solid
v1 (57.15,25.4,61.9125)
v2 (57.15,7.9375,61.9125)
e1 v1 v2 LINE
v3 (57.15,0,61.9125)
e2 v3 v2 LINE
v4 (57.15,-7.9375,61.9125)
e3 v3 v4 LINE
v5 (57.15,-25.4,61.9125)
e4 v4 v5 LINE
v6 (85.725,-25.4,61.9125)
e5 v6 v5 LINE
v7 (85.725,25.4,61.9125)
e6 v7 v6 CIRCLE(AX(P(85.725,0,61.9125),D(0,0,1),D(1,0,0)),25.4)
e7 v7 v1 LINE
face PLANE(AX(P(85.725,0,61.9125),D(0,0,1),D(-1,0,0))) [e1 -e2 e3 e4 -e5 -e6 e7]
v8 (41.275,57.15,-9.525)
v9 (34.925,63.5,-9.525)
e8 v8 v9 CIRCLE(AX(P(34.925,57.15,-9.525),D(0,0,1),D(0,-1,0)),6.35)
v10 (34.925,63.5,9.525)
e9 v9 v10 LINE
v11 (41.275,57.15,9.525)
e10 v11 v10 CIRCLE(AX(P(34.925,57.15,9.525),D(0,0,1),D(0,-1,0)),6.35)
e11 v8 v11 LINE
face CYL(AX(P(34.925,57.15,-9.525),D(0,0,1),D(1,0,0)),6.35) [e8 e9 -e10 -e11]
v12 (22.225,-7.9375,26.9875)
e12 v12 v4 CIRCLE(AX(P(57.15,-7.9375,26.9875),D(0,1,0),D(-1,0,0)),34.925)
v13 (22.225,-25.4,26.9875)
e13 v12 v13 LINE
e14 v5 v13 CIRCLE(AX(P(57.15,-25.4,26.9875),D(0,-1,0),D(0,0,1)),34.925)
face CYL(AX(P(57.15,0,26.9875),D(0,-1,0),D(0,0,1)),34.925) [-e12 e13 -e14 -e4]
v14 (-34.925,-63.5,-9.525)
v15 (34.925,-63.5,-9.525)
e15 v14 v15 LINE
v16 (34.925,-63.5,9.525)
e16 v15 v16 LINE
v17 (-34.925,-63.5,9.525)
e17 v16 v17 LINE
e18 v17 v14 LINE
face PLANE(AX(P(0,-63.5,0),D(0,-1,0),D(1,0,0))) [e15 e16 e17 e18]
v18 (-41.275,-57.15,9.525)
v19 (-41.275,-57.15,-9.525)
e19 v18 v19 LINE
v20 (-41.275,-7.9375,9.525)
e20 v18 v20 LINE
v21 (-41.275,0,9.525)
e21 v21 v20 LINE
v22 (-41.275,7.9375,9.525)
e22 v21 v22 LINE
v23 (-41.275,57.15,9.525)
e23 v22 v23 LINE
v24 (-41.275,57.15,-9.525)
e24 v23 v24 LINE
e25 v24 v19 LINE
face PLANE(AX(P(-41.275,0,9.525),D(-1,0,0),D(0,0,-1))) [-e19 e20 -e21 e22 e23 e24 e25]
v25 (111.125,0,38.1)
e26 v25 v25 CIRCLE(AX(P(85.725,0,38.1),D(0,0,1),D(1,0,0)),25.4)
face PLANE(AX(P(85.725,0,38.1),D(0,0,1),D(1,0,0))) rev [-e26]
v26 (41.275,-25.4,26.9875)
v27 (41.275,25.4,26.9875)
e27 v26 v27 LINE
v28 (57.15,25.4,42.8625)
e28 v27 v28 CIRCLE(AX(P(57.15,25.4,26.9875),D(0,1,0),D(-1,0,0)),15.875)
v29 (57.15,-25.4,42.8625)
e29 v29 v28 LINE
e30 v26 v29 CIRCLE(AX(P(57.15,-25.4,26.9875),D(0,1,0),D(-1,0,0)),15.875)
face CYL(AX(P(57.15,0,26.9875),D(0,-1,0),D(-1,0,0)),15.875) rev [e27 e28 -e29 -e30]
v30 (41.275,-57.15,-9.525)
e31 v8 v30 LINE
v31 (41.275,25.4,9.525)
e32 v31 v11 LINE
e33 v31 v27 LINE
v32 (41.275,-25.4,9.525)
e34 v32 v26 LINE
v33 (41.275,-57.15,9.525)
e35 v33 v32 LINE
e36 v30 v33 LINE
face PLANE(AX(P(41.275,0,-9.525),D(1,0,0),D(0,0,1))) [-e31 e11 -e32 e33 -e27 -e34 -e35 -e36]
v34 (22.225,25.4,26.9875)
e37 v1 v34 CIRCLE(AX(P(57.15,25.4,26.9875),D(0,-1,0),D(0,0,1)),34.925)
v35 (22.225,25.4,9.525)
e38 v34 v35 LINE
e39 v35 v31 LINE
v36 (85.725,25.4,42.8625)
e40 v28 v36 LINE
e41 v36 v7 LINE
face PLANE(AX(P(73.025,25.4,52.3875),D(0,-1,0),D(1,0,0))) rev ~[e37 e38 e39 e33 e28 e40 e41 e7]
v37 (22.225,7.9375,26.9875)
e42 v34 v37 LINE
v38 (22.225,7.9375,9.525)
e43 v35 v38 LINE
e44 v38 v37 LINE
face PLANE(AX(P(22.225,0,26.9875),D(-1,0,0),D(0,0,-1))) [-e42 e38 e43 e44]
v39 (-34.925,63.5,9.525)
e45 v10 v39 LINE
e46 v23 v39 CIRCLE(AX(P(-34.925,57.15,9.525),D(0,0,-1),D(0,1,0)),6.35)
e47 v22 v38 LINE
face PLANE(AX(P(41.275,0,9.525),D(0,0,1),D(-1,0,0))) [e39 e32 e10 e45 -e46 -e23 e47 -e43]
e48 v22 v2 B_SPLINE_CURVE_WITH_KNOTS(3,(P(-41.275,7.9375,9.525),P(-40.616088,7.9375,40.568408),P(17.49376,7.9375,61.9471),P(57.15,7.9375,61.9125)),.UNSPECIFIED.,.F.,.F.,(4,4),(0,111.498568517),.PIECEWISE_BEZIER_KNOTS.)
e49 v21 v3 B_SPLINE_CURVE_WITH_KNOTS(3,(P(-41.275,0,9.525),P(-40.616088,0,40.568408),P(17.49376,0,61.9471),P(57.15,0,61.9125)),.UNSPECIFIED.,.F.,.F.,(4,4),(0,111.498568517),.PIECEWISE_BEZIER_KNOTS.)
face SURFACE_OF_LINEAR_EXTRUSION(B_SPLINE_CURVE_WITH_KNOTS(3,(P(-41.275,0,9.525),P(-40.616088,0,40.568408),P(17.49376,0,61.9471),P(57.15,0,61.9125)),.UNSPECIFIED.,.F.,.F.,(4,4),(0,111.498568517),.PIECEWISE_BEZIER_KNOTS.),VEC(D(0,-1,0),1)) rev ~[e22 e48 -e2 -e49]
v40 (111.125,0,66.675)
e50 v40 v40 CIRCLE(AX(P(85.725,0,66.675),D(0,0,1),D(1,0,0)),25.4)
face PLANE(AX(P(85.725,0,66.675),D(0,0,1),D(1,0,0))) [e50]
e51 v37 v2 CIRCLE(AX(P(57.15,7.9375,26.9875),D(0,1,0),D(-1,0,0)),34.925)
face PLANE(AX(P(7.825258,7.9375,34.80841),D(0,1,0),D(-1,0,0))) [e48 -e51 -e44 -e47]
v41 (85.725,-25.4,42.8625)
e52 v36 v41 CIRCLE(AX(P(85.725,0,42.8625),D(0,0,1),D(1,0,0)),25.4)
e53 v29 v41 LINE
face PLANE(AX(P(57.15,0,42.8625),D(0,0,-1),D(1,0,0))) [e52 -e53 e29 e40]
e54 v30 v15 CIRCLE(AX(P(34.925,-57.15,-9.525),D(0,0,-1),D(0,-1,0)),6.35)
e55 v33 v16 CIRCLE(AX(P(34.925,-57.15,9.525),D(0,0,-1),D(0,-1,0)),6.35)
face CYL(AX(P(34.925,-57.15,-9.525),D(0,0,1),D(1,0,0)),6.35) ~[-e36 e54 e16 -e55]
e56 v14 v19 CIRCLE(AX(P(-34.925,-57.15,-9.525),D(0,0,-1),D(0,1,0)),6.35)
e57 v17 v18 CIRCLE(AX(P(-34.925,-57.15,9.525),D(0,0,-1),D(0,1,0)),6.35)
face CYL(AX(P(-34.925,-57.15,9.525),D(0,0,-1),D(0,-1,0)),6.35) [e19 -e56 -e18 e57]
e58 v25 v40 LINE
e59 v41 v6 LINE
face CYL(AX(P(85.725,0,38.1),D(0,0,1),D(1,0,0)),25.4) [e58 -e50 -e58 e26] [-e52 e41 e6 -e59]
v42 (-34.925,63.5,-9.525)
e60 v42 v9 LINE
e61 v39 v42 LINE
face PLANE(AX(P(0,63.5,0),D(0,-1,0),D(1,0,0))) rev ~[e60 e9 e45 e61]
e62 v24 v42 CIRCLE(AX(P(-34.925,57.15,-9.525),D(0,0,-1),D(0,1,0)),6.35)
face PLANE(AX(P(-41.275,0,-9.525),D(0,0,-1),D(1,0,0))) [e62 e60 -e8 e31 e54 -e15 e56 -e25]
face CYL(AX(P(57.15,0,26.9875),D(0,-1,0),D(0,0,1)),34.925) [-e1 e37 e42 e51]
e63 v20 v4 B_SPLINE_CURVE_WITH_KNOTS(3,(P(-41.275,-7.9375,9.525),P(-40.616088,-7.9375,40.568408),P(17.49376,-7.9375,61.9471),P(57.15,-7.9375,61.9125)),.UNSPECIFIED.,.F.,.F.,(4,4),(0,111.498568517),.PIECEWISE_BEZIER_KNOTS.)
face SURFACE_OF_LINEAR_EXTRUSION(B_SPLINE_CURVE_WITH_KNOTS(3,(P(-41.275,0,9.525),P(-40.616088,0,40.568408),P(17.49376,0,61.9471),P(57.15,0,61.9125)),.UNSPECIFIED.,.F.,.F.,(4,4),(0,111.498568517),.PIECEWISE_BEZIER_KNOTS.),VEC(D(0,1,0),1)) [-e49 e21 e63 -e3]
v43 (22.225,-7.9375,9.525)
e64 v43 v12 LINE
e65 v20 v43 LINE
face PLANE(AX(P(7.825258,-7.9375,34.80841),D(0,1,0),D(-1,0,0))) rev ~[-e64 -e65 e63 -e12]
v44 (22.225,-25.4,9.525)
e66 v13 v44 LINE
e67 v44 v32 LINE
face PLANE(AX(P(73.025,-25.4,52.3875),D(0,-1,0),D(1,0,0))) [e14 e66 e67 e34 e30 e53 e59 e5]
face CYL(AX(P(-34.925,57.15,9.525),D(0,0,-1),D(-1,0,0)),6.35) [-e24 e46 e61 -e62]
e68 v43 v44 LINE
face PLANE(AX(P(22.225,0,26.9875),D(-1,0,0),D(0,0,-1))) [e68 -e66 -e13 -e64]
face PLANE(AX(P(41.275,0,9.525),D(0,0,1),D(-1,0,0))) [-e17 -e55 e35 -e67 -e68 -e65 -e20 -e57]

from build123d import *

# Parameters (mm, degrees)
F1_DEPTH = 63.5
F0_W     = 25.4
F0_H     = 19.05
F2_DEPTH = 25.4
F3_DEPTH = 7.9375
F5_R     = 6.35


# Not quite as in the source:
# - a feature names something its author has since deleted; it is built from what else it names


with BuildPart() as f1:
    # F0 (on Front) → F1 (new body, symmetric)
    with BuildSketch(Plane.XZ):
        Polygon((-41.275, 9.525), (-41.275, -9.525), (41.275, -9.525), (41.275, 9.525), (22.225, 9.525), align=None)
    extrude(amount=F1_DEPTH, both=True)

    # F0 (on Front) → F2 (join, symmetric)
    with BuildSketch(Plane.XZ):
        with Locations((73.025, 52.3875)):
            Rectangle(F0_W, F0_H)
        with BuildLine():
            Line((22.225, 9.525), (41.275, 9.525))
            Line((41.275, 9.525), (41.275, 26.9875))
            ThreePointArc((41.275, 26.9875), (45.9246798487, 38.2128201513), (57.15, 42.8625))
            Line((57.15, 42.8625), (60.325, 42.8625))
            Line((60.325, 42.8625), (60.325, 61.9125))
            Line((60.325, 61.9125), (57.15, 61.9125))
            ThreePointArc((57.15, 61.9125), (32.4542956671, 51.6832043329), (22.225, 26.9875))
            Line((22.225, 26.9875), (22.225, 9.525))
        make_face()
    extrude(amount=F2_DEPTH, both=True)

    # F0 (on Front) → F3 (join, symmetric)
    with BuildSketch(Plane.XZ):
        with BuildLine():
            add(Edge.make_bspline(
                [(-41.275, 9.525), (-40.6160876155, 40.568407625), (17.4937602133, 61.9470998645), (57.15, 61.9125)],
                knots=[0, 0, 0, 0, 111.4985685166, 111.4985685166, 111.4985685166, 111.4985685166], degree=3))
            Line((-41.275, 9.525), (22.225, 9.525))
            Line((22.225, 9.525), (22.225, 26.9875))
            ThreePointArc((22.225, 26.9875), (32.4542956671, 51.6832043329), (57.15, 61.9125))
        make_face()
    extrude(amount=F3_DEPTH, both=True)

    # F0 (on Front) → F4 (revolve)
    with BuildSketch(Plane.XZ):
        Polygon((85.725, 66.675), (85.725, 61.9125), (85.725, 42.8625), (85.725, 38.1), (111.125, 38.1), (111.125, 66.675), align=None)
    revolve(axis=Axis((85.725, 0, 52.3875), (0, 0, 1)))

    # F5
    f5_edges = [f1.edges().sort_by_distance(p)[0] for p in [
        (41.275, -63.5, 0),
        (-41.275, -63.5, 0),
        (41.275, 63.5, 0),
        (-41.275, 63.5, 0),
    ]]
    fillet(f5_edges, radius=F5_R)


solid = f1.part
